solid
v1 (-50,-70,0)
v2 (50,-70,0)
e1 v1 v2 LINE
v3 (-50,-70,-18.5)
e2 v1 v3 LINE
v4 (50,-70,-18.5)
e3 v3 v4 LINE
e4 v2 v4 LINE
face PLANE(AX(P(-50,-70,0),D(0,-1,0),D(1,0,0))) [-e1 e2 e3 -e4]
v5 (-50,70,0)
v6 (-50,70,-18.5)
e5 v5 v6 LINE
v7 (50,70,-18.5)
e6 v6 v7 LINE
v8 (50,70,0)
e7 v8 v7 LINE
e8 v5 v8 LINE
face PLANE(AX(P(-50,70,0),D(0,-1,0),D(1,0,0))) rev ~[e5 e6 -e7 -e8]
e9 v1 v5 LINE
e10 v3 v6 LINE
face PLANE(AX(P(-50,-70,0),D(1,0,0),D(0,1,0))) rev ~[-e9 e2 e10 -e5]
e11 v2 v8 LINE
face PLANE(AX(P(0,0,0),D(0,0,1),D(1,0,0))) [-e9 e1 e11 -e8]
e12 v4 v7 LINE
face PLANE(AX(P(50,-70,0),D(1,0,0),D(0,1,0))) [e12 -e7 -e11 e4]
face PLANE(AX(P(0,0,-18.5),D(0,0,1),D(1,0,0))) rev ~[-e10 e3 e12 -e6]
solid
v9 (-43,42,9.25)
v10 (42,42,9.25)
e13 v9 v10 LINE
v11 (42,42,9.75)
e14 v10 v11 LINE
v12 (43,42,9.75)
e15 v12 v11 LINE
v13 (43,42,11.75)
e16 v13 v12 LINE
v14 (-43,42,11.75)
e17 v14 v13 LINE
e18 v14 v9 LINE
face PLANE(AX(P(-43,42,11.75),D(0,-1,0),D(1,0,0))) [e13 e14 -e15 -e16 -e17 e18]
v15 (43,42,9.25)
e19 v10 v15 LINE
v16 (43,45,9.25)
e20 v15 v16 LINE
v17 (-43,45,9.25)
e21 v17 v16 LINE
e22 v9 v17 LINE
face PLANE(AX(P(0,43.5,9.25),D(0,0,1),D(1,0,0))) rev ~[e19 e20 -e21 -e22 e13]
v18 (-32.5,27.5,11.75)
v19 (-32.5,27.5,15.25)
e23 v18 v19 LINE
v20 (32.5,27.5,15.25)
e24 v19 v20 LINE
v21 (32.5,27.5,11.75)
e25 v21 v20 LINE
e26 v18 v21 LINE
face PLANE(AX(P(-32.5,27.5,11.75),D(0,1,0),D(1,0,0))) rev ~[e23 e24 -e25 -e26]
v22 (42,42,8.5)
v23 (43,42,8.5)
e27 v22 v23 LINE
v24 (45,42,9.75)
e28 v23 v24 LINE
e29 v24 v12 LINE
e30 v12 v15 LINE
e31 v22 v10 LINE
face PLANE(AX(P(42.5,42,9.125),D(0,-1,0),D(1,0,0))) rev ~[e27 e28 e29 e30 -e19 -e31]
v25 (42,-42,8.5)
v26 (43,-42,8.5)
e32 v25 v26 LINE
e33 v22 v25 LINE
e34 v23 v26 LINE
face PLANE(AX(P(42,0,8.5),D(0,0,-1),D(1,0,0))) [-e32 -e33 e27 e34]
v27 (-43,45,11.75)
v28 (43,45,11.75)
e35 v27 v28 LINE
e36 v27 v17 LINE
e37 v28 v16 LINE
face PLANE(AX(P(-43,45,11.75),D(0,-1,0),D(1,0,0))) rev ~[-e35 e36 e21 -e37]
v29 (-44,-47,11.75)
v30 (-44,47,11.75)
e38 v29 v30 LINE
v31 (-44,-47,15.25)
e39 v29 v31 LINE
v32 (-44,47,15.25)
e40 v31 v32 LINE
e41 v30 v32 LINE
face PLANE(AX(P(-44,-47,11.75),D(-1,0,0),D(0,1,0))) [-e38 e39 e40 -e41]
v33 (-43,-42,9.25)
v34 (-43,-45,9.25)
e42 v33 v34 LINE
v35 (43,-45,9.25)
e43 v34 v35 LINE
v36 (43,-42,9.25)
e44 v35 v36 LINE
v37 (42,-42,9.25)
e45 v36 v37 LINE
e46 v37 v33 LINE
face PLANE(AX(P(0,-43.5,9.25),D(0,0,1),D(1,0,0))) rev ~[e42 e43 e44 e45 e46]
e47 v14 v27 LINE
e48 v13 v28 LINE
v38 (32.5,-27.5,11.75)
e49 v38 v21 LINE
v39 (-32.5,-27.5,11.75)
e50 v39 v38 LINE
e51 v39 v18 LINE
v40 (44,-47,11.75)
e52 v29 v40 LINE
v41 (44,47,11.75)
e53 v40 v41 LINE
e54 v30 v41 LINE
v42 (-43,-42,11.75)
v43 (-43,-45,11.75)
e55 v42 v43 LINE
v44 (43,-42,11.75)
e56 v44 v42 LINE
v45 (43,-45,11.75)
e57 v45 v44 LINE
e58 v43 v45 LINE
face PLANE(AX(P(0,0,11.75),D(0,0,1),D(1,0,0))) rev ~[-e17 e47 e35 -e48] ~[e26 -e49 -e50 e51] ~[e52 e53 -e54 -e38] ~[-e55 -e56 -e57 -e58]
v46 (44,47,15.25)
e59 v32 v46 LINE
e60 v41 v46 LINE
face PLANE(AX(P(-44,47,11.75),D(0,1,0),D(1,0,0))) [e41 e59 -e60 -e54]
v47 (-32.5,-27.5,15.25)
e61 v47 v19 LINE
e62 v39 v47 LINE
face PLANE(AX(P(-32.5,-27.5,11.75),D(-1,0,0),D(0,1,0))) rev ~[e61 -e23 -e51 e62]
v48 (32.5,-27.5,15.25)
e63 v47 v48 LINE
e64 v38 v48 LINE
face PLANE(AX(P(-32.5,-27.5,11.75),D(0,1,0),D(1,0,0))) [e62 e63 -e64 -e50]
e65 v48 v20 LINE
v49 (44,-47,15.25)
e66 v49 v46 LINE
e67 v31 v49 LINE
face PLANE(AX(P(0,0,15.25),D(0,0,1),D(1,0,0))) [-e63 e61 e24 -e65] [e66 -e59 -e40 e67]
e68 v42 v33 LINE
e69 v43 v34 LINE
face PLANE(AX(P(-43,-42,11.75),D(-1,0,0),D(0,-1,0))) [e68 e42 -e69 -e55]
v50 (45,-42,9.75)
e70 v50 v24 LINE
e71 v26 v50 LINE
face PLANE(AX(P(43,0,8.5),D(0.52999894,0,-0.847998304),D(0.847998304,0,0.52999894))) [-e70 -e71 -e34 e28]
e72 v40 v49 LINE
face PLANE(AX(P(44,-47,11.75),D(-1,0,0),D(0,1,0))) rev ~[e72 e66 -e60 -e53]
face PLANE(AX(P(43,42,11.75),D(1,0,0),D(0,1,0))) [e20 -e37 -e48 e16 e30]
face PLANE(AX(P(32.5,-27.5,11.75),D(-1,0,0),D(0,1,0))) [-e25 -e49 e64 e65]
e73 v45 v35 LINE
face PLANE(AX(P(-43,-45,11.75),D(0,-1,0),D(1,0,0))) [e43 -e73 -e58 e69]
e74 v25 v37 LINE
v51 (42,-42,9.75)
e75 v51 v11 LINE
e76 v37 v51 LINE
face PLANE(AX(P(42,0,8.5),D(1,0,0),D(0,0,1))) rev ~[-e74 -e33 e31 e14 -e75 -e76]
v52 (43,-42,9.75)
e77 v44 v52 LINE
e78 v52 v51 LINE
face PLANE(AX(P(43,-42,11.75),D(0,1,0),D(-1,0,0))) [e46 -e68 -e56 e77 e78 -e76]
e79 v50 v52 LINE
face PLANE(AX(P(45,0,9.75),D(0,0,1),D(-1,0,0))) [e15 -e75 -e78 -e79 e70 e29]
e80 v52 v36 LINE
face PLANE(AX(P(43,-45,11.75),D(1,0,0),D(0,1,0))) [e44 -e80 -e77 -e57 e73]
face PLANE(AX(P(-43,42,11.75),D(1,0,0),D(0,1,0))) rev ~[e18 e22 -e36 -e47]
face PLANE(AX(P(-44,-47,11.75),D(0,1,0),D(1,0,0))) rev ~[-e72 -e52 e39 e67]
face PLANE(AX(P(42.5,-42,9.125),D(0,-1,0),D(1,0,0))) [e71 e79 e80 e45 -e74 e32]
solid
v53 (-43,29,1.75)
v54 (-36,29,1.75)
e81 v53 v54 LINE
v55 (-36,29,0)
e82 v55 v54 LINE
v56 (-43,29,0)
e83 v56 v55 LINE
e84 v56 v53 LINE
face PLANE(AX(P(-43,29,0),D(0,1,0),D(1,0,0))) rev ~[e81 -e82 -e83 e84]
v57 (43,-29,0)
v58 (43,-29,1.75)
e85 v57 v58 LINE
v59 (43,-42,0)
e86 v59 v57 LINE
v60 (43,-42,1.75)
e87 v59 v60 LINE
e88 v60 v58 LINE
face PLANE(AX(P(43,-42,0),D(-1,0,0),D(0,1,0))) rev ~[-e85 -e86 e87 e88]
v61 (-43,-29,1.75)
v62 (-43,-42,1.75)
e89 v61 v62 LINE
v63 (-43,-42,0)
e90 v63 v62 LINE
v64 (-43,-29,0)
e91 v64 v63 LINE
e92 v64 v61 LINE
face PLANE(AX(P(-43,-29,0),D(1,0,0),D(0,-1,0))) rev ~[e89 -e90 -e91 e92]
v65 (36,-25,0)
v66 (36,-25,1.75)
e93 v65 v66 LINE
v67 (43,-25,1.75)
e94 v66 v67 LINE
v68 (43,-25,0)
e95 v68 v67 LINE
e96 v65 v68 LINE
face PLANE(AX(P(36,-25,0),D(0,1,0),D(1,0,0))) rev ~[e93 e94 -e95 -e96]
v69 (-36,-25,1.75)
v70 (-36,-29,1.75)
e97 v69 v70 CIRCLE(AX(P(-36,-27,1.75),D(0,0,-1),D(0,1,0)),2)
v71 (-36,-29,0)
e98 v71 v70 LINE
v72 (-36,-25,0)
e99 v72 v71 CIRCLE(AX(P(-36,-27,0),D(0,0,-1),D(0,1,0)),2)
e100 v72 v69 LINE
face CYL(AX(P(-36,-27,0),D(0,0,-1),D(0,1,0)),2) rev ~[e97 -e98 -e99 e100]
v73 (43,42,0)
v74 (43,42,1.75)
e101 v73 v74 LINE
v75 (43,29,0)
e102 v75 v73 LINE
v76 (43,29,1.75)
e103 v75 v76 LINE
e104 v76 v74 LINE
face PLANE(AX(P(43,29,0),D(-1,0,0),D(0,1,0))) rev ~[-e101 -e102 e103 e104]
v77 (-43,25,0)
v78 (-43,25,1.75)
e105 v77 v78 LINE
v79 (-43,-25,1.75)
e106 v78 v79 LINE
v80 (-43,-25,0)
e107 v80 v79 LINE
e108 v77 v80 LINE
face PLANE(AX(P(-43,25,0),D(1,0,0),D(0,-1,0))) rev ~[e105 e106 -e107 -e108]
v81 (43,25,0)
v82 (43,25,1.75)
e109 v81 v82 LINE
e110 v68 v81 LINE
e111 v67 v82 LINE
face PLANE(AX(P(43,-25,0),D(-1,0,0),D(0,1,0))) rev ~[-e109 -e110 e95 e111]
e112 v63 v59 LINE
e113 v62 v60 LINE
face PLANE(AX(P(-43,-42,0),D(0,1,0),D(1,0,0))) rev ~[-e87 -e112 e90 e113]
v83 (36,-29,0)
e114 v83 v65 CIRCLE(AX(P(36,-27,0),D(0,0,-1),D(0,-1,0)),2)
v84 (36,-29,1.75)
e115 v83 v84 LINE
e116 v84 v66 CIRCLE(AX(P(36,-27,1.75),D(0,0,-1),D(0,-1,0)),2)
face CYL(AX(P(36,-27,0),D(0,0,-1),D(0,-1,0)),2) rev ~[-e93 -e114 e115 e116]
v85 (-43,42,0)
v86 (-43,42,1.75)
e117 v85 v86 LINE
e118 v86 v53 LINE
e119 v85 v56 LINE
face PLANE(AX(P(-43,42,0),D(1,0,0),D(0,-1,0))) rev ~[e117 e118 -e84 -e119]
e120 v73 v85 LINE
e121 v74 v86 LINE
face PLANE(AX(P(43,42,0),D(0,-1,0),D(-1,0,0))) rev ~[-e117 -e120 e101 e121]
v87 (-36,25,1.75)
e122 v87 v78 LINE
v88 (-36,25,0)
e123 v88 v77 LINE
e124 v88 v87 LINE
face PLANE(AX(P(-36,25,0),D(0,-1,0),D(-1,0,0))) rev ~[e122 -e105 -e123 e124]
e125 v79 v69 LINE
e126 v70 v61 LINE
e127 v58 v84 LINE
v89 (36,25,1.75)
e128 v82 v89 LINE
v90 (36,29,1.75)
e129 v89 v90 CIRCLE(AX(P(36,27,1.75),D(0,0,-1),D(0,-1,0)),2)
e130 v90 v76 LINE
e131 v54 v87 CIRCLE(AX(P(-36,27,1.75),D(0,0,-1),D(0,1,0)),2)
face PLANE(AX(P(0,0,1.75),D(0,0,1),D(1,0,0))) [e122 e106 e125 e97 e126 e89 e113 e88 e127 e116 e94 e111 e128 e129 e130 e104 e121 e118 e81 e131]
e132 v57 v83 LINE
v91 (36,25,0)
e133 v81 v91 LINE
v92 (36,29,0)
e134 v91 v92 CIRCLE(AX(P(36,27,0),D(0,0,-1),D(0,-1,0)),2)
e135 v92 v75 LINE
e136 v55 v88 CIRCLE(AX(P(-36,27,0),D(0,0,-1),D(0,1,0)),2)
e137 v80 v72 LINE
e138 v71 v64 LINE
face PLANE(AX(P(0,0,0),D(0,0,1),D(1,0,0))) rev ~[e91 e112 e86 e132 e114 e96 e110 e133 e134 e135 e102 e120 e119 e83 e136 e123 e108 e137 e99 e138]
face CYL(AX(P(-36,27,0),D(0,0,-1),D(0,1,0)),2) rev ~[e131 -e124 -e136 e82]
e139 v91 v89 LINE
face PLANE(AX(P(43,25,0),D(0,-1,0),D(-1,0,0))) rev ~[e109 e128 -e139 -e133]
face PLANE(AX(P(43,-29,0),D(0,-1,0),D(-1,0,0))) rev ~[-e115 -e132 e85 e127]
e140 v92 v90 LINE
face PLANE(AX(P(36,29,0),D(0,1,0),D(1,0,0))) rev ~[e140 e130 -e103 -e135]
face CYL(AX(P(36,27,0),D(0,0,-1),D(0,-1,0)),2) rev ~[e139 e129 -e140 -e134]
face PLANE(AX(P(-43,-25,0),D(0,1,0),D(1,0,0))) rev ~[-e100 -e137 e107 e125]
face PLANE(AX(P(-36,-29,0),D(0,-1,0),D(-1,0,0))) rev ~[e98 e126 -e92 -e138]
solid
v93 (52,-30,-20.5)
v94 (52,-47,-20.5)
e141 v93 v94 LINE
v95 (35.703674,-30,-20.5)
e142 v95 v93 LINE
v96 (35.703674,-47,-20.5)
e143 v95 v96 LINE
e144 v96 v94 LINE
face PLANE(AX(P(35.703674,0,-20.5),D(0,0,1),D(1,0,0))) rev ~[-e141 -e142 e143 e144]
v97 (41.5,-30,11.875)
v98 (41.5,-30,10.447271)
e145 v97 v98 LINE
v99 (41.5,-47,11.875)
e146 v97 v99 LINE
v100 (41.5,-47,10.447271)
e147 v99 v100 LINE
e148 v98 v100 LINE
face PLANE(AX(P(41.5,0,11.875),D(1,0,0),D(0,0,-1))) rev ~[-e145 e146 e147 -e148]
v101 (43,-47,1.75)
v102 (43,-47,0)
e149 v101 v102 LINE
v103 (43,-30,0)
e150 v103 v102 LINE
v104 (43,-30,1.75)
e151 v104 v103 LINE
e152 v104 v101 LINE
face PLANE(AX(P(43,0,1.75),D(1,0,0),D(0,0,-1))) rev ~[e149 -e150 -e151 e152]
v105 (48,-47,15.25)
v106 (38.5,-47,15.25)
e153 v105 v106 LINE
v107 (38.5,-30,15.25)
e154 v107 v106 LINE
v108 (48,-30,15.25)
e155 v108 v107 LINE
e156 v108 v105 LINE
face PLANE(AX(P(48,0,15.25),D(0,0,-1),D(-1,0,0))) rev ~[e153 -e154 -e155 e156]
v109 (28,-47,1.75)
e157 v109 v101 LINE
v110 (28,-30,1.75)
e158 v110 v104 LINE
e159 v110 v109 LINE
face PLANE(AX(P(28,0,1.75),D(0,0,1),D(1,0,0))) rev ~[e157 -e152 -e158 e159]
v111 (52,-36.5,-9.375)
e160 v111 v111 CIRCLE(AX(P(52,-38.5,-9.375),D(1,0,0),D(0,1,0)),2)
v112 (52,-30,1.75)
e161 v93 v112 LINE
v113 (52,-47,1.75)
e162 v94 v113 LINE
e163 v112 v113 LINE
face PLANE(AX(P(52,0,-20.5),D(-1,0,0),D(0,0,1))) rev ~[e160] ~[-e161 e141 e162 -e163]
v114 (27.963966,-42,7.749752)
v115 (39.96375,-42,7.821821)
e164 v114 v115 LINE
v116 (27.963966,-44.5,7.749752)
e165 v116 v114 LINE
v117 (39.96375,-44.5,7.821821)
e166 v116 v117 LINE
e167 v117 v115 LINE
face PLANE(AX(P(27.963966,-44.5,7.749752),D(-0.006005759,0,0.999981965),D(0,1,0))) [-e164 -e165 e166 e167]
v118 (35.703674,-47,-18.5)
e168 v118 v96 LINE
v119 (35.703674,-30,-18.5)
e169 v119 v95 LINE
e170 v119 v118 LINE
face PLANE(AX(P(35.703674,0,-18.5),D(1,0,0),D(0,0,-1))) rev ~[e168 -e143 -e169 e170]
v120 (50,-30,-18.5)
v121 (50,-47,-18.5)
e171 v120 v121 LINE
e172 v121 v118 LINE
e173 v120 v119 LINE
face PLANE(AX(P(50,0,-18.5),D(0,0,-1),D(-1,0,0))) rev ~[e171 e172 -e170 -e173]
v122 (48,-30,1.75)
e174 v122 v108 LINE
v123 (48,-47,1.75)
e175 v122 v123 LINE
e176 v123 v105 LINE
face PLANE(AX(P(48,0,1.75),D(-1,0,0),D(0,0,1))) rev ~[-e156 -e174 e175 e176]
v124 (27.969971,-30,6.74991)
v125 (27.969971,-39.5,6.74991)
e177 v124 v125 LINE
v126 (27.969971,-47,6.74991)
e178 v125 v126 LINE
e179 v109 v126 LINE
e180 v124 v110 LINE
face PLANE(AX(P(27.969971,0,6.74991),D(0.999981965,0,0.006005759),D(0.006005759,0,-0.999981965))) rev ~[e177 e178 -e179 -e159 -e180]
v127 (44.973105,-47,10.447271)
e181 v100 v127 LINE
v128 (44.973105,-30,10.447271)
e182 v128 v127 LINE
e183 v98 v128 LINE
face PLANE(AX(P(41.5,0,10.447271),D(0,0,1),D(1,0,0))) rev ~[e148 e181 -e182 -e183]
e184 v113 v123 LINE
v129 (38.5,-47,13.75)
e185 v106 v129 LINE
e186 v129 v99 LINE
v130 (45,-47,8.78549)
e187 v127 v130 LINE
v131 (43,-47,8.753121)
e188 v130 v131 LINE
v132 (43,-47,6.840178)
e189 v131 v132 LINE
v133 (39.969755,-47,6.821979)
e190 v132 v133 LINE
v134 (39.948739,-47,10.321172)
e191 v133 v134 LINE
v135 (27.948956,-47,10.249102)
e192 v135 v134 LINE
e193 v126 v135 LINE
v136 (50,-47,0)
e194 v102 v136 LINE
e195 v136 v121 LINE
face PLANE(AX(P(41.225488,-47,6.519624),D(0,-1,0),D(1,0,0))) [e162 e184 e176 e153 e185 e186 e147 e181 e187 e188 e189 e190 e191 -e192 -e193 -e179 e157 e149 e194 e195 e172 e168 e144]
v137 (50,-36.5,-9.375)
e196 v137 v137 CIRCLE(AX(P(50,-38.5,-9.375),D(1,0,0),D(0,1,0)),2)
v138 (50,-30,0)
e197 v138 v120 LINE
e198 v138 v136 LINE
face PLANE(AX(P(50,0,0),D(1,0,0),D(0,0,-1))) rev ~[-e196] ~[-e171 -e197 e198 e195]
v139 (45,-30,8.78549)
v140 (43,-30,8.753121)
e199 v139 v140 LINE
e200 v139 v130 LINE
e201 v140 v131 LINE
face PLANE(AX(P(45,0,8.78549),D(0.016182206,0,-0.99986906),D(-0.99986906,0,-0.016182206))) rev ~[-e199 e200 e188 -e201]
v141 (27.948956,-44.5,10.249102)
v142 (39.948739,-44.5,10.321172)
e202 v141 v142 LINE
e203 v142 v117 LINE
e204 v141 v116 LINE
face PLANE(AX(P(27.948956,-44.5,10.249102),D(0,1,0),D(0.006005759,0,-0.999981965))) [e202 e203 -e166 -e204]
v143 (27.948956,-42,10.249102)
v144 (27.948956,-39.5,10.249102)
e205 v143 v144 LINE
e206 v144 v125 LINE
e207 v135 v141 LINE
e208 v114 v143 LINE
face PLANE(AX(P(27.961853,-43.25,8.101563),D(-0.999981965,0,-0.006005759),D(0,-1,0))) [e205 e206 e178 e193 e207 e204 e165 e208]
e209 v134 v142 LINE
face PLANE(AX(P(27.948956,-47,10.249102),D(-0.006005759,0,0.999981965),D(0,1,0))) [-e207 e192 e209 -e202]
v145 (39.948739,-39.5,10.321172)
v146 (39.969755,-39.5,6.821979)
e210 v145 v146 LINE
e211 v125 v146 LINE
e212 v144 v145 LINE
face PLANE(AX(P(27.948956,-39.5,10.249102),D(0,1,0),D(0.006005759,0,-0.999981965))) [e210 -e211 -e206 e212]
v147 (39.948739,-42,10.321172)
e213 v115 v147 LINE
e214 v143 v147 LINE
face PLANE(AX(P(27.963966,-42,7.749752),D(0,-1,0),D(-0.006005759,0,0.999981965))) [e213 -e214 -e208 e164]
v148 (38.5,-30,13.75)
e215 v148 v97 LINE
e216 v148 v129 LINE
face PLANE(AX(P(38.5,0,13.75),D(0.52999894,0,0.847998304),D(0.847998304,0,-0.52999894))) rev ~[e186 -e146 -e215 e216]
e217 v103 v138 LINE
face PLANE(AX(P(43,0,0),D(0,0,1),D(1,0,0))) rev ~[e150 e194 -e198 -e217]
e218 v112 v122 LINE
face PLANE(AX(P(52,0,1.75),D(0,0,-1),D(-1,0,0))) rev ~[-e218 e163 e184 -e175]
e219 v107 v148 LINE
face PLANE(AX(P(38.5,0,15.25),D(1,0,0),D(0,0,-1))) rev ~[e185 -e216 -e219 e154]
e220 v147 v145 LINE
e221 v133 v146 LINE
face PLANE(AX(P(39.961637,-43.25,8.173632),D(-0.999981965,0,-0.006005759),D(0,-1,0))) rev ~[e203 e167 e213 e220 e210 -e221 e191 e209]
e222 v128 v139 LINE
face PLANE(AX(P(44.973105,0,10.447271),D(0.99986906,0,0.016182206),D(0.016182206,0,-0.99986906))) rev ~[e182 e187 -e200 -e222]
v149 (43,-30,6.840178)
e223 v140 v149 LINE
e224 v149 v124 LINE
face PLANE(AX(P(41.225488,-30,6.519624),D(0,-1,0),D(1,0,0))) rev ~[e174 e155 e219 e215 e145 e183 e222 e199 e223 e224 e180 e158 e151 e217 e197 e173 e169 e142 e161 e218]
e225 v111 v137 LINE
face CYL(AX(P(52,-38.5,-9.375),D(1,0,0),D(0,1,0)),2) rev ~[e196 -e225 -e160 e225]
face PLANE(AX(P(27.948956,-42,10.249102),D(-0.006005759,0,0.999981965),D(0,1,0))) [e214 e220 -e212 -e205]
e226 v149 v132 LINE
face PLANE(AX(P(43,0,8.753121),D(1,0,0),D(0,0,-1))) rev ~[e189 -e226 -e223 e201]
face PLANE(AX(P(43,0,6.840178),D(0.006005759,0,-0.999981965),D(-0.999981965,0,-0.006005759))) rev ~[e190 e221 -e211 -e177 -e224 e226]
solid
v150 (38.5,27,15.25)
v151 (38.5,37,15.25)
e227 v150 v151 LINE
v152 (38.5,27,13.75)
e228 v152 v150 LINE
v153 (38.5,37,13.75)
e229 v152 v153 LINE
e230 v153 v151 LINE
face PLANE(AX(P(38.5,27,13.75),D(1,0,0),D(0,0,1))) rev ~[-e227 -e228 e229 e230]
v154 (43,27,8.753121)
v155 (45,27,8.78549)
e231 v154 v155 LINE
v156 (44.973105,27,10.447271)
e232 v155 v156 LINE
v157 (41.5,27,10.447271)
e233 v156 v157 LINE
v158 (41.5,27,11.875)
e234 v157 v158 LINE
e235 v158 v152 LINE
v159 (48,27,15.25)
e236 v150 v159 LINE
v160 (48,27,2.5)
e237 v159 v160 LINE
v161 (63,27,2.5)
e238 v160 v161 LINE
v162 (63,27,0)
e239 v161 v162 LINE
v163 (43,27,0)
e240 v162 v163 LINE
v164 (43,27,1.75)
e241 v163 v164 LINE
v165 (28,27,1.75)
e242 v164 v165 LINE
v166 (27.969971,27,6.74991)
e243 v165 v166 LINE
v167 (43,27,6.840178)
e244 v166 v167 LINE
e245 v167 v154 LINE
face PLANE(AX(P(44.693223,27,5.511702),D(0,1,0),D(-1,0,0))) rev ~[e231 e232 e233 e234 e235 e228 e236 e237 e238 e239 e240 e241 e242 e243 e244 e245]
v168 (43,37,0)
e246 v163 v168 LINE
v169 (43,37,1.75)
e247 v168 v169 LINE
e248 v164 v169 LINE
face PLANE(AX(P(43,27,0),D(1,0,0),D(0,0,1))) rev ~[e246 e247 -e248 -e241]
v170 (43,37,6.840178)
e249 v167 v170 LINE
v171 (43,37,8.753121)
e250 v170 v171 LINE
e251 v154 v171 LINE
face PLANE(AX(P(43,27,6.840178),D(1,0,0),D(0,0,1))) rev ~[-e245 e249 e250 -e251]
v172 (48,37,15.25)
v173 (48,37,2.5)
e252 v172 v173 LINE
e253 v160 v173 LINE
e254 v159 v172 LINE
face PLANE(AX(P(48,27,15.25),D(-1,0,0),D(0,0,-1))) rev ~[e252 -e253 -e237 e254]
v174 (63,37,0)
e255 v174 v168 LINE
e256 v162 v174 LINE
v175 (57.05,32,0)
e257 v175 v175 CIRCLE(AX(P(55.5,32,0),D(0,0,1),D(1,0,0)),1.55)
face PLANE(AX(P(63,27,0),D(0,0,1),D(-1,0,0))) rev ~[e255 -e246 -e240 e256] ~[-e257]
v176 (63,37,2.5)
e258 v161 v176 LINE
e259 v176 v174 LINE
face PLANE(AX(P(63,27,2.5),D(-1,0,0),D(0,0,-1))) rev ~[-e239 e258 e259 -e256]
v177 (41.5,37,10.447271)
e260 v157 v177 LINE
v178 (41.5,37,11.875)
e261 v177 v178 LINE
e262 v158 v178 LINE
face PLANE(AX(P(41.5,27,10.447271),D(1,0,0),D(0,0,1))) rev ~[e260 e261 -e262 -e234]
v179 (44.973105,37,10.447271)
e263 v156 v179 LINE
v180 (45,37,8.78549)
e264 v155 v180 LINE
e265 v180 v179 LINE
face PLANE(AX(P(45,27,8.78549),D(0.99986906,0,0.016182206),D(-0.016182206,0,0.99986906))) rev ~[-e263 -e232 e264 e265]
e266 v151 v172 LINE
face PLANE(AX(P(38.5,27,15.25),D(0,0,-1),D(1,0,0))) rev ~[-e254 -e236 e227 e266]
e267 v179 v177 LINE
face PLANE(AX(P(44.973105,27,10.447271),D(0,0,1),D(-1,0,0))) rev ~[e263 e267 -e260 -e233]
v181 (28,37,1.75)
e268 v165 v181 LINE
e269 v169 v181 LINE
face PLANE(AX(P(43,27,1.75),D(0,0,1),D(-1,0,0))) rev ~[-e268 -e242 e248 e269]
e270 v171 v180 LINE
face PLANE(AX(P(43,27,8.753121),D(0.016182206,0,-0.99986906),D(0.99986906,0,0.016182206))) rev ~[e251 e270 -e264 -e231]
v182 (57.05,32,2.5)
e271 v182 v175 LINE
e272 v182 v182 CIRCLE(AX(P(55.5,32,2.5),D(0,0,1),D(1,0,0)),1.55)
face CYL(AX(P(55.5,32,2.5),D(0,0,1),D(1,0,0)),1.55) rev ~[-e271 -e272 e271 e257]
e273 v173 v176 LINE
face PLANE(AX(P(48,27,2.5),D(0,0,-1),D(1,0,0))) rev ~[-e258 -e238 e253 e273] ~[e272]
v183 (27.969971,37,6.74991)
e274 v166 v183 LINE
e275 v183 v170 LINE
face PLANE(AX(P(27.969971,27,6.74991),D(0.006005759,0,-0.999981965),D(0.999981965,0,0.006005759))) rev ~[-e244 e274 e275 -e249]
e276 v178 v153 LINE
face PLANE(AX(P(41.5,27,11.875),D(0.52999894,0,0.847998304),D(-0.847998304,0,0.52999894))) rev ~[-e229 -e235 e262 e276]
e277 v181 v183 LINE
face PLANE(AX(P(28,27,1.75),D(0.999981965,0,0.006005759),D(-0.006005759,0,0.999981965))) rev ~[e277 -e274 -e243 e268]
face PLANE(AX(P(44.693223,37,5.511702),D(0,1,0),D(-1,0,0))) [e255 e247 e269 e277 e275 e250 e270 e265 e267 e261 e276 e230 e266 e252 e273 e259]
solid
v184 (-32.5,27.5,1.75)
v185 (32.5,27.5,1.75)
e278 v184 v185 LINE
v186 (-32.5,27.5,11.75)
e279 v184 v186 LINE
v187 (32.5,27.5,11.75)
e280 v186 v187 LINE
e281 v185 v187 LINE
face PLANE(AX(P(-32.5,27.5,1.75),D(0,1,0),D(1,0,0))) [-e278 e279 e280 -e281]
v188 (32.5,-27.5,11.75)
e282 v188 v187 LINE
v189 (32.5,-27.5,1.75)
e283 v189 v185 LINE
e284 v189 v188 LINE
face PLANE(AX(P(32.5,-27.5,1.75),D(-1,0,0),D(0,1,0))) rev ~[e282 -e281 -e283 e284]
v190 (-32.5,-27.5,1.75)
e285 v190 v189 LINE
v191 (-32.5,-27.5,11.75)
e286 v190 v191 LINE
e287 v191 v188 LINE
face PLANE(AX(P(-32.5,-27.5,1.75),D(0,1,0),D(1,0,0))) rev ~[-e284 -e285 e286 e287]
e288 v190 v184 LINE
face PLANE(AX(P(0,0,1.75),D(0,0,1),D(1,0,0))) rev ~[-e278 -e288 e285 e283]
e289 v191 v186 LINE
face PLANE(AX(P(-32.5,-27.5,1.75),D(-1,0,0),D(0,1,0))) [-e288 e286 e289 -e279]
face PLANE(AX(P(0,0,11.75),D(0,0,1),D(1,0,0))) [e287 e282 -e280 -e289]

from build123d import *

# Parameters (mm, degrees)
F0_W           = 100
F0_H           = 140
F1_DEPTH       = 18.5
F3_DEPTH       = 1.75
F4_W           = 65
F4_H           = 55
F5_DEPTH       = 10
F6_W           = 88
F6_H           = 94
F6_W_2         = 86
F6_H_2         = 84
F6_W_3         = 65
F6_H_3         = 55
F6_H_4         = 3
F7_DEPTH       = 3.5
F8_DEPTH       = 2.5
F9_W           = 1
F9_H           = 1.25
F10_DEPTH      = 42
F10_DEPTH_BACK = 42
F12_DEPTH      = 47
F13_DEPTH      = 30
F15_DEPTH      = 12
F16_R          = 2
F17_DEPTH      = 3
F20_DEPTH      = 10
F21_R          = 1.55
F22_DEPTH      = 25


with BuildPart() as f1:
    # F0 (on Top) → F1 (new body)
    with BuildSketch(Plane.XY):
        Rectangle(F0_W, F0_H)
    extrude(amount=-F1_DEPTH)


with BuildPart() as f3:
    # F2 (on Top) → F3 (new body)
    with BuildSketch(Plane.XY):
        with BuildLine():
            Line((43, 42), (-43, 42))
            Line((-43, 42), (-43, 29))
            Line((-43, 29), (-36, 29))
            ThreePointArc((-36, 29), (-34, 27), (-36, 25))
            Line((-36, 25), (-43, 25))
            Line((-43, 25), (-43, -25))
            Line((-43, -25), (-36, -25))
            ThreePointArc((-36, -25), (-34, -27), (-36, -29))
            Line((-36, -29), (-43, -29))
            Line((-43, -29), (-43, -42))
            Line((-43, -42), (43, -42))
            Line((43, -42), (43, -29))
            Line((43, -29), (36, -29))
            ThreePointArc((36, -29), (34, -27), (36, -25))
            Line((36, -25), (43, -25))
            Line((43, -25), (43, 25))
            Line((43, 25), (36, 25))
            ThreePointArc((36, 25), (34, 27), (36, 29))
            Line((36, 29), (43, 29))
            Line((43, 29), (43, 42))
        make_face()
    extrude(amount=F3_DEPTH)


with BuildPart() as f5:
    # F4 (on face) → F5 (new body)
    with BuildSketch(Plane.XY.offset(1.75)):
        Rectangle(F4_W, F4_H)
    extrude(amount=F5_DEPTH)


with BuildPart() as f7:
    # F6 (on face) → F7 (new body)
    with BuildSketch(Plane.XY.offset(11.75)):
        Rectangle(F6_W, F6_H)
        Polygon((-43, 42), (-43, 45), (43, 45), (43, 42), (43, -42), (43, -44), (43, -45), (-43, -45), (-43, -44), (-43, -42), align=None, mode=Mode.SUBTRACT)
        Rectangle(F6_W_2, F6_H_2)
        Rectangle(F6_W_3, F6_H_3, mode=Mode.SUBTRACT)
        with Locations((0, 43.5)):
            Rectangle(F6_W_2, F6_H_4)
        Polygon((43, -42), (-43, -42), (-43, -44), (-43, -45), (43, -45), (43, -44), align=None)
    extrude(amount=F7_DEPTH)

    # F6 (on face) → F8 (join)
    with BuildSketch(Plane.XY.offset(11.75)):
        with Locations((0, 43.5)):
            Rectangle(F6_W_2, F6_H_4)
        Polygon((43, -42), (-43, -42), (-43, -44), (-43, -45), (43, -45), (43, -44), align=None)
    extrude(amount=-F8_DEPTH)

    # F9 (on Front) → F10 (join, two sides)
    with BuildSketch(Plane.XZ) as f10_sk:
        with Locations((42.5, 9.125)):
            Rectangle(F9_W, F9_H)
        Polygon((43, 9.75), (43, 8.5), (45, 9.75), align=None)
    extrude(amount=F10_DEPTH)
    extrude(f10_sk.sketch, amount=-F10_DEPTH_BACK)


with BuildPart() as f12:
    # F11 (on Front) → F12 (new body)
    with BuildSketch(Plane.XZ):
        Polygon((27.9699712028, 6.7499098263), (28, 1.75), (43, 1.75), (43, 0), (48, 0), (50, 0), (52, 0), (52, 1.75), (48, 1.75), (48, 13.75), (48, 15.25), (38.5, 15.25), (38.5, 13.75), (41.5, 11.875), (41.5, 10.4472711682), (44.9731051922, 10.4472711682), (45, 8.7854899466), (43, 8.7531212961), (43, 6.8401781918), align=None)
        Polygon((52, 0), (50, 0), (50, -18.5), (35.7036739588, -18.5), (35.7036739588, -20.5), (52, -20.5), align=None)
    extrude(amount=F12_DEPTH)

    # F11 (on Front) → F13 (cut)
    with BuildSketch(Plane.XZ):
        Polygon((27.9699712028, 6.7499098263), (28, 1.75), (43, 1.75), (43, 0), (48, 0), (50, 0), (52, 0), (52, 1.75), (48, 1.75), (48, 13.75), (48, 15.25), (38.5, 15.25), (38.5, 13.75), (41.5, 11.875), (41.5, 10.4472711682), (44.9731051922, 10.4472711682), (45, 8.7854899466), (43, 8.7531212961), (43, 6.8401781918), align=None)
        Polygon((52, 0), (50, 0), (50, -18.5), (35.7036739588, -18.5), (35.7036739588, -20.5), (52, -20.5), align=None)
    extrude(amount=F13_DEPTH, mode=Mode.SUBTRACT)

    # F14 (on face) → F15 (join)
    with BuildSketch(Plane(origin=(28.0094999534, 0, 0.1682213529), x_dir=(0, -1, 0), z_dir=(-0.9999819653, 0, -0.0060057594))):
        Polygon((39.5, 5.9370710514), (47, 5.9370710514), (47, 7.0816674463), (47, 10.0810629427), (44.5, 10.0810629427), (44.5, 7.5816674463), (42, 7.5816674463), (42, 9.5810629427), (42, 10.0810629427), (39.5, 10.0810629427), (39.5, 9.5810629427), align=None)
    extrude(amount=-F15_DEPTH)

    # F16 (on face) → F17 (cut)
    with BuildSketch(Plane.YZ.offset(52)):
        with Locations((-38.5, -9.375)):
            Circle(F16_R)
    extrude(amount=-F17_DEPTH, mode=Mode.SUBTRACT)


with BuildPart() as f20:
    # F19 (on offset) → F20 (new body)
    with BuildSketch(Plane(origin=(0, 27, 0), x_dir=(-1, 0, 0), z_dir=(0, 1, 0))):
        Polygon((-43, 1.75), (-28, 1.75), (-27.9699712028, 6.7499098263), (-43, 6.8401781918), (-43, 8.7531212961), (-45, 8.7854899466), (-44.9731051922, 10.4472711682), (-41.5, 10.4472711682), (-41.5, 11.875), (-38.5, 13.75), (-38.5, 15.25), (-48, 15.25), (-48, 2.5), (-63, 2.5), (-63, 0), (-43, 0), align=None)
    extrude(amount=F20_DEPTH)

    # F21 (on face) → F22 (cut)
    with BuildSketch(Plane.XY.offset(2.5)):
        with Locations((55.5, 32)):
            Circle(F21_R)
    extrude(amount=-F22_DEPTH, mode=Mode.SUBTRACT)


solid = Compound([f1.part, f3.part, f5.part, f7.part, f12.part, f20.part])
